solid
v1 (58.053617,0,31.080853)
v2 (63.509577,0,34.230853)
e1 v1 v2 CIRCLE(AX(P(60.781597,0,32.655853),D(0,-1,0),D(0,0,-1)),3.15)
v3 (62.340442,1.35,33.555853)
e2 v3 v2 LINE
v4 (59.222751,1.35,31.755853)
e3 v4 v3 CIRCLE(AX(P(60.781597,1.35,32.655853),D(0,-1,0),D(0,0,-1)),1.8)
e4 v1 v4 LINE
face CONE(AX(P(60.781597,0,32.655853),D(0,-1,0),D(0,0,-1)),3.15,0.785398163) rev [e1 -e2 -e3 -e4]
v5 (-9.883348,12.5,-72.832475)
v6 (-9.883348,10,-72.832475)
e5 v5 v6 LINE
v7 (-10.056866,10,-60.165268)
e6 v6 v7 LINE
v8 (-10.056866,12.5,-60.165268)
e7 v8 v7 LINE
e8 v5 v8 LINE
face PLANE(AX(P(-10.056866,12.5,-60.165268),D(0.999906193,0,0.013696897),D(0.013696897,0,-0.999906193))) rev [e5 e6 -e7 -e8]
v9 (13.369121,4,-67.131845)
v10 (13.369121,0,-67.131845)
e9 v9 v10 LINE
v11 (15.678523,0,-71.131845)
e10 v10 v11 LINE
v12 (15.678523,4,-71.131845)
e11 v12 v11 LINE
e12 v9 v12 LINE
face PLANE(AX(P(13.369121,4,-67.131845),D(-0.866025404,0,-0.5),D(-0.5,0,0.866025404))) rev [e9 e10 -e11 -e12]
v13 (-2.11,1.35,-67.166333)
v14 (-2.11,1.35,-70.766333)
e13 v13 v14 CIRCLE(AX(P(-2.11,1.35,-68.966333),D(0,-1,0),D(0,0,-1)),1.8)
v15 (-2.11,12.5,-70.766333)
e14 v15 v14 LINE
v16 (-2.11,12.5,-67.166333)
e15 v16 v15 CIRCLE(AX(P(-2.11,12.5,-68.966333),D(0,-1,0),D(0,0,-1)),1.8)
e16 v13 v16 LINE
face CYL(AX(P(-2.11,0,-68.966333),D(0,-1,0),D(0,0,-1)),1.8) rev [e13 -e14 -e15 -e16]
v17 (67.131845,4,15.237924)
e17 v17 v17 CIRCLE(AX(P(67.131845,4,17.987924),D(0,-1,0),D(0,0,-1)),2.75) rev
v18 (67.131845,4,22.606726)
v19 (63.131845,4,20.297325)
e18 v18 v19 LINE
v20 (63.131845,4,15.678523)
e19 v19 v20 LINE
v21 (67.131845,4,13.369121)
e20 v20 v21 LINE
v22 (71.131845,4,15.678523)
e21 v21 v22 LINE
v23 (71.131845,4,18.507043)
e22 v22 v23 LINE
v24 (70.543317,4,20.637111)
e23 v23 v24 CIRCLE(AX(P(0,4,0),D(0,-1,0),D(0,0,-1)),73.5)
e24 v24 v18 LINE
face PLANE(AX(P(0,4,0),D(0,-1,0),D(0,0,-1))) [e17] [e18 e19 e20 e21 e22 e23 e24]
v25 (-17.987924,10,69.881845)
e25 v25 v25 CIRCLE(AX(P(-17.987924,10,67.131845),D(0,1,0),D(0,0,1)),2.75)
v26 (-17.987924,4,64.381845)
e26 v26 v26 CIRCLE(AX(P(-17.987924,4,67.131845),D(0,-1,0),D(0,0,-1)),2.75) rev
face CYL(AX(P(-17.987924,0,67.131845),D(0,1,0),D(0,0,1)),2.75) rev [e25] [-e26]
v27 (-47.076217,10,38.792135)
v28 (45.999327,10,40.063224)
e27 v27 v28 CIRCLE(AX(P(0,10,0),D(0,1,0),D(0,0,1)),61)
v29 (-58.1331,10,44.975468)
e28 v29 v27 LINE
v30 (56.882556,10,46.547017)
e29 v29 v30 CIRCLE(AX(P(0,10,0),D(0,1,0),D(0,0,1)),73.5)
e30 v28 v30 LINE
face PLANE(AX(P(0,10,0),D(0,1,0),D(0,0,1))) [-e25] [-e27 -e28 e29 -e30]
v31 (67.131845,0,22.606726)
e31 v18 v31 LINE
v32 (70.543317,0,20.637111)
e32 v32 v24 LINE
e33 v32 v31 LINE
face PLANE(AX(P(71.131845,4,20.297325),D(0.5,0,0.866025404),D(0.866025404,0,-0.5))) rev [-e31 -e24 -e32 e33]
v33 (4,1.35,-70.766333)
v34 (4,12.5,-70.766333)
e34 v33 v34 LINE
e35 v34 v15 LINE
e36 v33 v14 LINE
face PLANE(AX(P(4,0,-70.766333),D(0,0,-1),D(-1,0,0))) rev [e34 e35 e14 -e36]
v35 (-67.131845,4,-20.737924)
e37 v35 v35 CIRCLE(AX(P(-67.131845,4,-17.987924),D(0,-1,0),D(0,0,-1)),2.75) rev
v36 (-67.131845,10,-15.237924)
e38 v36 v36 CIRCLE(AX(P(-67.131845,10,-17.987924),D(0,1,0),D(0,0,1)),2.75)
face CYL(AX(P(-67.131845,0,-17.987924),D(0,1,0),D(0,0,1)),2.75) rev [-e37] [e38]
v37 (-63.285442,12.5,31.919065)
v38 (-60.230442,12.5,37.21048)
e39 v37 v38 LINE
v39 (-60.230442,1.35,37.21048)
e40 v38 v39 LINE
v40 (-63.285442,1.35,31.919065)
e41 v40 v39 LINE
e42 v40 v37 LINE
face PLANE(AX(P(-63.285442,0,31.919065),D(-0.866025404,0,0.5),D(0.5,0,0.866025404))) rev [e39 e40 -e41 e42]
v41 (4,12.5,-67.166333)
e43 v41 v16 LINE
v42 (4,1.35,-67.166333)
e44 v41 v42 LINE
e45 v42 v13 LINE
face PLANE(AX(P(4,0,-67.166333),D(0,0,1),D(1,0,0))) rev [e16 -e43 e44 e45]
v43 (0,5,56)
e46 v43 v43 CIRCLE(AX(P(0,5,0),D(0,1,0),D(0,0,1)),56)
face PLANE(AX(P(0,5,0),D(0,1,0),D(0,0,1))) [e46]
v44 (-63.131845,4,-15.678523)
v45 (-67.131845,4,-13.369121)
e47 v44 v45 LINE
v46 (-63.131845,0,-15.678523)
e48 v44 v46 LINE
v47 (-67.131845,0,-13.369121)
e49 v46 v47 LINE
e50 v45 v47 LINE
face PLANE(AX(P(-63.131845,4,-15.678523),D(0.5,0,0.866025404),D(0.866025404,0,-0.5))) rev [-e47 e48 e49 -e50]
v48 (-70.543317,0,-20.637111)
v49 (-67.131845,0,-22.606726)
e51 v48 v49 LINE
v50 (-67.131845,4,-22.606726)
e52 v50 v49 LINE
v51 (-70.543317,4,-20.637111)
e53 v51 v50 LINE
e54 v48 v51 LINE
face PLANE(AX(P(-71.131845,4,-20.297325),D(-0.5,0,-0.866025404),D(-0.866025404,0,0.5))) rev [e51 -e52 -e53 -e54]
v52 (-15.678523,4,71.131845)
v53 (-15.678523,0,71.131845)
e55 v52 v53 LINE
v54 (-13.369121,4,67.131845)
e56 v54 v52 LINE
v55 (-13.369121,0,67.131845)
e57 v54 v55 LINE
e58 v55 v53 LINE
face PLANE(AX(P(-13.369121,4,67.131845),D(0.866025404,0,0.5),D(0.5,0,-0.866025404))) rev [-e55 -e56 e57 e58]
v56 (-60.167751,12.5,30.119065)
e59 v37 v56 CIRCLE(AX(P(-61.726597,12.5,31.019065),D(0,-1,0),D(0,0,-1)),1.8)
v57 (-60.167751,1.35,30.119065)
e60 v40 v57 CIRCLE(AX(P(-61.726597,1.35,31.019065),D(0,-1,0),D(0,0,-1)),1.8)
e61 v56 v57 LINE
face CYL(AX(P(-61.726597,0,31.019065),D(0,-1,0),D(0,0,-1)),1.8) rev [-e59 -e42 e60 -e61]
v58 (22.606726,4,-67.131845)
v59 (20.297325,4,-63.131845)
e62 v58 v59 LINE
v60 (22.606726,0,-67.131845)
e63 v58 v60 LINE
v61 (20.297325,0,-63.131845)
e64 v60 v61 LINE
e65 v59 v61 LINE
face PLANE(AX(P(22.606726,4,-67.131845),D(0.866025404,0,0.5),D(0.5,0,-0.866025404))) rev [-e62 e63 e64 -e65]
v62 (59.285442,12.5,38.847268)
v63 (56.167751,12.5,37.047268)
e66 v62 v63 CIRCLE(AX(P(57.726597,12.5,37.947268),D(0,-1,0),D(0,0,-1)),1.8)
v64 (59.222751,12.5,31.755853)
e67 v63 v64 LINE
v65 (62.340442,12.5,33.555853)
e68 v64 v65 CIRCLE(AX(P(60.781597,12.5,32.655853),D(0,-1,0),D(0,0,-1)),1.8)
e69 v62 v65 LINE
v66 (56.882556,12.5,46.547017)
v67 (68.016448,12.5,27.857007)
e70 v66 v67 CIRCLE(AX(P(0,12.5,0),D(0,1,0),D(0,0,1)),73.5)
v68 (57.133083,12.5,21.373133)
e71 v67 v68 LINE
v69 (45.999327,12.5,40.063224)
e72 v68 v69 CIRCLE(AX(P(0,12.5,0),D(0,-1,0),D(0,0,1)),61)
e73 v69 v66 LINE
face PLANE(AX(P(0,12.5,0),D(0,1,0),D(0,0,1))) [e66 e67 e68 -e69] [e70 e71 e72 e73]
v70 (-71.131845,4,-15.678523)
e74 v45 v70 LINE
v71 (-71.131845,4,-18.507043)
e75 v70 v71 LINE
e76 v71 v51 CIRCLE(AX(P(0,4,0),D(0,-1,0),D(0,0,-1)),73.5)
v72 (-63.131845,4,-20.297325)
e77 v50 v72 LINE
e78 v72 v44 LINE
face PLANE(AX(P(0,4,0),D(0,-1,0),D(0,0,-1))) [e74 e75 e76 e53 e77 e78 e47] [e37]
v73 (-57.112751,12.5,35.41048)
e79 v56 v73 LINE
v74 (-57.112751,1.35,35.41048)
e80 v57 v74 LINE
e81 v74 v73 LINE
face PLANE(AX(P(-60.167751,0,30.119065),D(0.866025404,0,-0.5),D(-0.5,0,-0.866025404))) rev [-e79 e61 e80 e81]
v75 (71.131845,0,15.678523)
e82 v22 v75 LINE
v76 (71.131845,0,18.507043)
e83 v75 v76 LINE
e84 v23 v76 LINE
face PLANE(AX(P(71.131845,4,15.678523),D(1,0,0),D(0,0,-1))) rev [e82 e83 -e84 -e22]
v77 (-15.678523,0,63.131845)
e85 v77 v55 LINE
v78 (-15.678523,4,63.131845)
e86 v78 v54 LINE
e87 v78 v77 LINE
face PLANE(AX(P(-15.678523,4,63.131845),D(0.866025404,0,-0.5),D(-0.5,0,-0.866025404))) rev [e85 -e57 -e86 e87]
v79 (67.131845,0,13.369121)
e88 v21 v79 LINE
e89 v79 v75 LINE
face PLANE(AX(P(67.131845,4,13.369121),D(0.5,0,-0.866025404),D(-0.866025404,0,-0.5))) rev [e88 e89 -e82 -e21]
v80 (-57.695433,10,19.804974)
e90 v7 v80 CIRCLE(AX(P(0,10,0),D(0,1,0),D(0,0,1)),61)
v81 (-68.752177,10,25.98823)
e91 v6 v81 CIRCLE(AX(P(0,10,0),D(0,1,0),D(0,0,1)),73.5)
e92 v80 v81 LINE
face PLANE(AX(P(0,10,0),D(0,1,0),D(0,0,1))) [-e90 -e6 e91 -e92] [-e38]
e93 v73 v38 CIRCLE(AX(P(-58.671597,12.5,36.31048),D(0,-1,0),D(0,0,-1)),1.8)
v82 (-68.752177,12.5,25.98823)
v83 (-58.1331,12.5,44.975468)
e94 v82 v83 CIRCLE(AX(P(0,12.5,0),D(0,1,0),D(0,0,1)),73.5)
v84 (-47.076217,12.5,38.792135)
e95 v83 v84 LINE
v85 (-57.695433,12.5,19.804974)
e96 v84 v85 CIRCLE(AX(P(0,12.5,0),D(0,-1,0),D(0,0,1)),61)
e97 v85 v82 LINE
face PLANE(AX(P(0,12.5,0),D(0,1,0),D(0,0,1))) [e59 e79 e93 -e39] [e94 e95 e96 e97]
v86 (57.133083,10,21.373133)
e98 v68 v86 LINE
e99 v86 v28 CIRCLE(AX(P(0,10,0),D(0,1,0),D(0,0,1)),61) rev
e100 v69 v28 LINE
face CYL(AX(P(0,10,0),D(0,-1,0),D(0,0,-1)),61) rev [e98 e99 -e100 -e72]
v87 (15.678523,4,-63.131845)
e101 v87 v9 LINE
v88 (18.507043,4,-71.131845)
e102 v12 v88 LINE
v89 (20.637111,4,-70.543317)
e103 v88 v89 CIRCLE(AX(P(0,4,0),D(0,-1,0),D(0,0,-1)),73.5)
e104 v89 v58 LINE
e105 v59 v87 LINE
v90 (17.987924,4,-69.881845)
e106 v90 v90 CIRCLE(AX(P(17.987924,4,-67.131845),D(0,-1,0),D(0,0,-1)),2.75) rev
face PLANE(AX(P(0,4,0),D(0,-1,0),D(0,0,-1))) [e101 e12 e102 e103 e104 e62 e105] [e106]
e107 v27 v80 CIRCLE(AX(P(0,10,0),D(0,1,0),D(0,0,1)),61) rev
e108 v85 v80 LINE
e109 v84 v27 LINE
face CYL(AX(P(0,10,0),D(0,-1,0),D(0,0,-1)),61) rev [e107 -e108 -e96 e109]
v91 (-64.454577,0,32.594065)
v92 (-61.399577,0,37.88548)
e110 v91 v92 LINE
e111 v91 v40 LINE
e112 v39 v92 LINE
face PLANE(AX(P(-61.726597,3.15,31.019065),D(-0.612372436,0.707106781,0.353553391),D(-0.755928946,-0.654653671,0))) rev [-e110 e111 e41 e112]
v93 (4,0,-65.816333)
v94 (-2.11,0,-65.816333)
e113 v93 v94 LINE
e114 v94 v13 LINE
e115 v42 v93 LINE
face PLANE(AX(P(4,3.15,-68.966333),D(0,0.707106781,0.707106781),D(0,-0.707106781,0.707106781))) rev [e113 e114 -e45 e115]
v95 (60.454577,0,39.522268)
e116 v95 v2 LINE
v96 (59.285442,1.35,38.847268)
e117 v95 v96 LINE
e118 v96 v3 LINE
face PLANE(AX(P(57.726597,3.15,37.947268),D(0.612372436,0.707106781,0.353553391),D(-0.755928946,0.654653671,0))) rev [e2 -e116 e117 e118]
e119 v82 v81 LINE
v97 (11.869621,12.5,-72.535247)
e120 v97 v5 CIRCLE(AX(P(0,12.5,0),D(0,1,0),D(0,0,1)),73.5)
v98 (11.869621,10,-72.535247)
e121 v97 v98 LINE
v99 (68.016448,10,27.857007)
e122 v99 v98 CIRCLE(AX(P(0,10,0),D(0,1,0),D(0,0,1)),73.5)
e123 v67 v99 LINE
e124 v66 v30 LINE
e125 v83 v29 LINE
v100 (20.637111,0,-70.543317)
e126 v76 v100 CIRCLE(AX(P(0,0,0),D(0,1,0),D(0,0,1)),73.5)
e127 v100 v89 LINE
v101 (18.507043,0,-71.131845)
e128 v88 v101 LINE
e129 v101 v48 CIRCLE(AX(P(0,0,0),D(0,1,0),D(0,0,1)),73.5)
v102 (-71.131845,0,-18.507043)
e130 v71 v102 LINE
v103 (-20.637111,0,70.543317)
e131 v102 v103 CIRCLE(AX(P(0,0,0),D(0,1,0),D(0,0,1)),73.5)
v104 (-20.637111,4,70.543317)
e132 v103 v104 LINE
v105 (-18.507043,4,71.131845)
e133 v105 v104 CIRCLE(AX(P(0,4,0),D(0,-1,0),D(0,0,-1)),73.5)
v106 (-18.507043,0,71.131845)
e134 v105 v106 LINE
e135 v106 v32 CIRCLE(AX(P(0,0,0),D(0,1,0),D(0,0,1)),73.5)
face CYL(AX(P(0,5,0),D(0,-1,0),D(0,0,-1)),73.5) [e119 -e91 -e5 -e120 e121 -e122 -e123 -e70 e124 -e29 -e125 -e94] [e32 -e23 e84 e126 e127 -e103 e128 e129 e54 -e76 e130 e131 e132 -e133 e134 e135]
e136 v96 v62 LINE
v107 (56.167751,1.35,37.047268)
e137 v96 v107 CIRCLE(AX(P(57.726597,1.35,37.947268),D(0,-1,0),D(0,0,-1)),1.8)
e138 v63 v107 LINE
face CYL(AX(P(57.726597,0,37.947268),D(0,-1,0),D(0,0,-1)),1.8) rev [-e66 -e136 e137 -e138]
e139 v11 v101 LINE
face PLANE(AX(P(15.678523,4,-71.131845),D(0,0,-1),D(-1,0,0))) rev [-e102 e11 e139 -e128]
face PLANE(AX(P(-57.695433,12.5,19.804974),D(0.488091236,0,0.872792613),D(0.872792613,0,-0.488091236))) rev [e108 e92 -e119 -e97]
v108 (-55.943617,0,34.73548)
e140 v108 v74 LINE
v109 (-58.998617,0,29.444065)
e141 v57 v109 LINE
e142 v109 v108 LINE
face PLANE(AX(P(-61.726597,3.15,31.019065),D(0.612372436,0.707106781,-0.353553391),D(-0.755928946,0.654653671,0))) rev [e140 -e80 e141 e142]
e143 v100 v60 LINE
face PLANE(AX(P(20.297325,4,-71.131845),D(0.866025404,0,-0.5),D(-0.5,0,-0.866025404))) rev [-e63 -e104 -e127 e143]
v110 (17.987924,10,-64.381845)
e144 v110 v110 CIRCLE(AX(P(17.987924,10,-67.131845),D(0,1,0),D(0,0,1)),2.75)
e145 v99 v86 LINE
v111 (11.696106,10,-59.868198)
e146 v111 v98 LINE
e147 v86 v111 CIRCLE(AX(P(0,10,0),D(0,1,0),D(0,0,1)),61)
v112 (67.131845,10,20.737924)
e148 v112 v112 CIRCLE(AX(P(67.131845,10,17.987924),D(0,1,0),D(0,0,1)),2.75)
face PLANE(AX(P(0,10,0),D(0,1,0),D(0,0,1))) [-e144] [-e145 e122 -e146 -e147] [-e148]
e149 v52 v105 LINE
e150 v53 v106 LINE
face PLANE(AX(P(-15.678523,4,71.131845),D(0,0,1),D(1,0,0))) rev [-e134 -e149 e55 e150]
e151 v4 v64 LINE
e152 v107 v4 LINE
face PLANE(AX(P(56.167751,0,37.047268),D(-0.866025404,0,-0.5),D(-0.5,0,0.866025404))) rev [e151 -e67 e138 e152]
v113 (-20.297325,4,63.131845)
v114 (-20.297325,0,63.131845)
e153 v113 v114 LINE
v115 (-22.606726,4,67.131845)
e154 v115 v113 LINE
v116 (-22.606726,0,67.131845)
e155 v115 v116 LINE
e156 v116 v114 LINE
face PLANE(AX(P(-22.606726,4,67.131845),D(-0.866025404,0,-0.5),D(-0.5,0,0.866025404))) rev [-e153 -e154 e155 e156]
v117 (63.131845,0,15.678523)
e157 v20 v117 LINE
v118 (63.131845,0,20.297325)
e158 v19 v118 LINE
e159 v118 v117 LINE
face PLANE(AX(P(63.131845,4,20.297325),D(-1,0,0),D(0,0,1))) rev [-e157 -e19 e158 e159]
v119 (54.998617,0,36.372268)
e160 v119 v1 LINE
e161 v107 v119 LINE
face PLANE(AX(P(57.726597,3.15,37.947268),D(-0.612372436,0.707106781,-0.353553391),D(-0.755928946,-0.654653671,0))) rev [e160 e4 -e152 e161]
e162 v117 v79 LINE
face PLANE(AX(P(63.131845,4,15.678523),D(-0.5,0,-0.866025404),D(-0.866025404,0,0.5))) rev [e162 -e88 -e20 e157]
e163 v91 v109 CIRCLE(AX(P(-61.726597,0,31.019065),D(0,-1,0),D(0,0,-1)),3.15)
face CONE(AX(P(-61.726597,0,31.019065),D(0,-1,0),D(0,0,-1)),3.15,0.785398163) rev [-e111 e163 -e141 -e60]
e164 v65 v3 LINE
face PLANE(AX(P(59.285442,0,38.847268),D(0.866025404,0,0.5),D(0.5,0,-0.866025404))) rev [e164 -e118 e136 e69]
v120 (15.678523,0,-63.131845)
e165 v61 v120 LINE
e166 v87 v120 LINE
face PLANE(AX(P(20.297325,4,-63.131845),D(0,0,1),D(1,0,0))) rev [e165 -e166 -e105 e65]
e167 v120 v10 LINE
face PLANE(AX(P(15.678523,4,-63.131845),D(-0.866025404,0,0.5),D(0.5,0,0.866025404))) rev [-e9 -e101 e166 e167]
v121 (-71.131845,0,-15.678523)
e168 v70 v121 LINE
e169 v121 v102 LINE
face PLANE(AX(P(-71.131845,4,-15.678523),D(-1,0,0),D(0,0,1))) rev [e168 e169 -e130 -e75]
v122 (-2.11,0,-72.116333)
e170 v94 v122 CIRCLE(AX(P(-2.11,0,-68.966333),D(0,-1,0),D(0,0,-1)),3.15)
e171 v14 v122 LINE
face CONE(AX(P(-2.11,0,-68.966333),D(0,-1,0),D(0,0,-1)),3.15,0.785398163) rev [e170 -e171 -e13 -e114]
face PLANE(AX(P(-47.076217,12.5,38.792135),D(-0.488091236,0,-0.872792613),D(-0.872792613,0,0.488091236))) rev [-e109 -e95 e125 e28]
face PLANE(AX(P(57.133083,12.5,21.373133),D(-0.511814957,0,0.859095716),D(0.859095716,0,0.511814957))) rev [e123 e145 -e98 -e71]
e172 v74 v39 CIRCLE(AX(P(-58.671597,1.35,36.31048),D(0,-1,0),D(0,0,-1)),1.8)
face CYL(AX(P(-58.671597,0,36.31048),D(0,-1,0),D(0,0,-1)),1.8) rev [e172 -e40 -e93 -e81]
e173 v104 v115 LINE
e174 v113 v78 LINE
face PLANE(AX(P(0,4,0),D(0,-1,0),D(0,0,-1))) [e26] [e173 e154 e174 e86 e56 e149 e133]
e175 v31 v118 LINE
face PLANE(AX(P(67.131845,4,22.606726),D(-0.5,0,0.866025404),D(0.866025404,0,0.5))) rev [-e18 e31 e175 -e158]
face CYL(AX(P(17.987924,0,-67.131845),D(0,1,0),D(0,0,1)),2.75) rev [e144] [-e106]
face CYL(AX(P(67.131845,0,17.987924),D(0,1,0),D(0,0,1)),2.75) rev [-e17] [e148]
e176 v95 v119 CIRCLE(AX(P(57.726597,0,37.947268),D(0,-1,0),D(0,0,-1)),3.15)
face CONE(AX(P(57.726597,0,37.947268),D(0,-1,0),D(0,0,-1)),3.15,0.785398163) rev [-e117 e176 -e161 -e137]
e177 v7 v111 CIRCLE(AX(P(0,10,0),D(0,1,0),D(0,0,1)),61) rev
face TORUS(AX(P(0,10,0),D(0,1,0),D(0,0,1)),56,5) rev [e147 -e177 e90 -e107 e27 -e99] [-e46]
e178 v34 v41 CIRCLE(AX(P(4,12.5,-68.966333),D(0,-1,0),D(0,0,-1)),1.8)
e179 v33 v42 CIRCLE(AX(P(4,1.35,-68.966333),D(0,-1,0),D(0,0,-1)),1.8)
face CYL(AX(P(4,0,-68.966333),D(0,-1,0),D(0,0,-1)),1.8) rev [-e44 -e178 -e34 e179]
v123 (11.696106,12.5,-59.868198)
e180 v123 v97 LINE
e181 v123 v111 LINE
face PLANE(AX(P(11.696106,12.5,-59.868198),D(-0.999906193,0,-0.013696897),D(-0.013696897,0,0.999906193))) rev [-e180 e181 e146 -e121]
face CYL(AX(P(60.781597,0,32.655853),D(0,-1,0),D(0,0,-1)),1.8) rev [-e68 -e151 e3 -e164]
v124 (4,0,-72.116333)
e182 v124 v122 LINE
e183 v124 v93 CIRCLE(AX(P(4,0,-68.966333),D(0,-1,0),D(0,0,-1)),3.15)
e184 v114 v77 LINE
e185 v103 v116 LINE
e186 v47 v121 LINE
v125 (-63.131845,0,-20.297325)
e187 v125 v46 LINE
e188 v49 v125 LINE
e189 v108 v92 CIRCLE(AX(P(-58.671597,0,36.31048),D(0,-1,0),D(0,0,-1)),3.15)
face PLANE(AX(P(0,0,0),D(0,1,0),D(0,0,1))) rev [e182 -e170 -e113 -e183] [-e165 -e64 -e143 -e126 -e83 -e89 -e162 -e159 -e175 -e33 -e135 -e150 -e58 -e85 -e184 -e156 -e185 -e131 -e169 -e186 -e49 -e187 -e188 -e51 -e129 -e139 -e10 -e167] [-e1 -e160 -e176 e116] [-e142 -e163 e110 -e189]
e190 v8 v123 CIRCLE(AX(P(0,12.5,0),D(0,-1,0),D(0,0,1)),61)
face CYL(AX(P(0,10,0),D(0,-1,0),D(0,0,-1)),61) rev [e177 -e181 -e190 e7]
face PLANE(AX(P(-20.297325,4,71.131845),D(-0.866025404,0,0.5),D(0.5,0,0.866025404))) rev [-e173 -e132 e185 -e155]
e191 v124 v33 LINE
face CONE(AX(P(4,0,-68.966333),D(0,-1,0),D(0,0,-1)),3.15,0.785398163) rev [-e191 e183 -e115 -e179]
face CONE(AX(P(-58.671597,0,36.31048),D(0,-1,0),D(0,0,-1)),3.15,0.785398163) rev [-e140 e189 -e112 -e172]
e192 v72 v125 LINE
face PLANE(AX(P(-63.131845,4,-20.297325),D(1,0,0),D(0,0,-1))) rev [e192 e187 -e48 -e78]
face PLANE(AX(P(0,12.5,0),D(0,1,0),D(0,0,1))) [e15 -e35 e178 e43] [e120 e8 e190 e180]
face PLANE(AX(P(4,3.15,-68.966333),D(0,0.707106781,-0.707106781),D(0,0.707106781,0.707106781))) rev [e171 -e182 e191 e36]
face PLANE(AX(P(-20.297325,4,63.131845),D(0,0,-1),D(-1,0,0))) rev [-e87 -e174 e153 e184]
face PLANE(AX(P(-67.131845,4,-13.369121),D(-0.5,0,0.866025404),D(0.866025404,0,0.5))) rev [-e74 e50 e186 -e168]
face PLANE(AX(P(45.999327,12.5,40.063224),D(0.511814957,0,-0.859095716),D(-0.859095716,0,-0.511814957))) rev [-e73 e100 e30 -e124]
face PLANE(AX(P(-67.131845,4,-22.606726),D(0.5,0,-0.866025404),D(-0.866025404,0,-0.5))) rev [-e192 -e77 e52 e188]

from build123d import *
from build123d.topology import SkipClean

# Parameters (mm, degrees)
CROQUIS1_R                                     = 73.5
SALIENTE_EXTRUIR1_DEPTH                        = 5
CROQUIS7_R                                     = 73.5
CROQUIS7_R_2                                   = 61
SALIENTE_EXTRUIR2_DEPTH                        = 5
CROQUIS8_R                                     = 2.75
CORTAR_EXTRUIR5_DEPTH                          = 105.424613957
CORTAR_EXTRUIR6_DEPTH                          = 4
BOSS_EXTRUDE1_DEPTH                            = 2.5
CSK_SLOT_FOR_M3_FLAT_HEAD_MACHINE_SCREW1_DEPTH = 12.5
CIRPATTERN1_COUNT                              = 3
FILLET3_R                                      = 5


with BuildPart() as part:
    # Croquis1 → Saliente-Extruir1 (new body)
    with BuildSketch(Plane(origin=(0, 0, 0), x_dir=(1, 0, 0), z_dir=(0, 1, 0))):
        with Locations(Location((0, 0, 0), (0, 0, 270))):
            Circle(CROQUIS1_R)
    extrude(amount=SALIENTE_EXTRUIR1_DEPTH)

    # Croquis7 → Saliente-Extruir2 (add)
    with BuildSketch(Plane(origin=(0, 5, 0), x_dir=(1, 0, 0), z_dir=(0, 1, 0))):
        with Locations(Location((0, 0, 0), (0, 0, 270))):
            Circle(CROQUIS7_R)
        with Locations(Location((0, 0, 0), (0, 0, 270))):
            Circle(CROQUIS7_R_2, mode=Mode.SUBTRACT)
    extrude(amount=SALIENTE_EXTRUIR2_DEPTH)

    # Croquis8 → Cortar-Extruir5 (cut, through all)
    with BuildSketch(Plane(origin=(0, 10, 0), x_dir=(1, 0, 0), z_dir=(0, 1, 0))):
        with Locations(Location((-17.987923635, -67.131844927, 0), (0, 0, 270))):
            Circle(CROQUIS8_R)
        with Locations(Location((-67.131844927, 17.987923635, 0), (0, 0, 270))):
            Circle(CROQUIS8_R)
        with Locations(Location((17.987923635, 67.131844927, 0), (0, 0, 270))):
            Circle(CROQUIS8_R)
        with Locations(Location((67.131844927, -17.987923635, 0), (0, 0, 270))):
            Circle(CROQUIS8_R)
    extrude(amount=-CORTAR_EXTRUIR5_DEPTH, mode=Mode.SUBTRACT)

    # Croquis9 → Cortar-Extruir6 (cut)
    with BuildSketch(Plane(origin=(0, 0, 0), x_dir=(-1, 0, 0), z_dir=(0, -1, 0))):
        Polygon((20.297324711, -63.131844927), (15.678522558, -63.131844927), (13.369121481, -67.131844927), (15.678522558, -71.131844927), (20.297324711, -71.131844927), (22.606725788, -67.131844927), align=None)
        Polygon((-63.131844927, -20.297324711), (-63.131844927, -15.678522558), (-67.131844927, -13.369121481), (-71.131844927, -15.678522558), (-71.131844927, -20.297324711), (-67.131844927, -22.606725788), align=None)
        Polygon((-20.297324711, 63.131844927), (-15.678522558, 63.131844927), (-13.369121481, 67.131844927), (-15.678522558, 71.131844927), (-20.297324711, 71.131844927), (-22.606725788, 67.131844927), align=None)
        Polygon((63.131844927, 20.297324711), (63.131844927, 15.678522558), (67.131844927, 13.369121481), (71.131844927, 15.678522558), (71.131844927, 20.297324711), (67.131844927, 22.606725788), align=None)
    extrude(amount=-CORTAR_EXTRUIR6_DEPTH, mode=Mode.SUBTRACT)

    # Sketch3 → Boss-Extrude1 (add)
    with SkipClean():  # the faces are left unmerged after this step: merging them gives an invalid solid
        with BuildSketch(Plane(origin=(0, 10, 0), x_dir=(1, 0, 0), z_dir=(0, 1, 0))):
            with BuildLine():
                Line((11.696105723, 59.868197826), (11.869621272, 72.535247231))
                ThreePointArc((11.869621272, 72.535247231), (1.004194341, 73.493139773), (-9.883348207, 72.832475093))
                Line((-9.883348207, 72.832475093), (-10.056865919, 60.165267787))
                ThreePointArc((-10.056865919, 60.165267787), (0.832970242, 60.994312526), (11.696105723, 59.868197826))
            make_face()
            with BuildLine():
                Line((-57.695433057, -19.804974232), (-68.752177408, -25.98823006))
                ThreePointArc((-68.752177408, -25.98823006), (-64.149023218, -35.876912077), (-58.133099548, -44.975468168))
                Line((-58.133099548, -44.975468168), (-47.076217369, -38.792135262))
                ThreePointArc((-47.076217369, -38.792135262), (-53.239109255, -29.775782873), (-57.695433057, -19.804974232))
            make_face()
            with BuildLine():
                Line((45.999327335, -40.063223594), (56.882556136, -46.547017171))
                ThreePointArc((56.882556136, -46.547017171), (63.144828877, -37.616227696), (68.016447755, -27.857006925))
                Line((68.016447755, -27.857006925), (57.133083289, -21.373132525))
                ThreePointArc((57.133083289, -21.373132525), (52.406139013, -31.218529653), (45.999327335, -40.063223594))
            make_face()
        extrude(amount=BOSS_EXTRUDE1_DEPTH)

    # CSK SLOT for M3 Flat Head Machine Screw1: read off the stored shape, not the designer's step
    # CSK SLOT for M3 Flat Head Machine Sc 2 → CSK SLOT for M3 Flat Head Machine Screw1 (cut)
    with SkipClean():  # the faces are left unmerged after this step: merging them gives an invalid solid
        with BuildSketch(Plane(origin=(0, 0, 0), x_dir=(1, 0, 0), z_dir=(0, 1, 0))):
            with BuildLine():
                ThreePointArc((-60.230442327, -37.210480227), (-57.7715966, -37.869325954), (-57.112750874, -35.410480227))
                Line((-57.112750874, -35.410480227), (-60.167750874, -30.11906501))
                ThreePointArc((-60.167750874, -30.11906501), (-62.626596601, -29.460219283), (-63.285442327, -31.91906501))
                Line((-63.285442327, -31.91906501), (-60.230442327, -37.210480227))
            make_face()
        csk_slot_for_m3_flat_head_machine_screw1 = extrude(amount=CSK_SLOT_FOR_M3_FLAT_HEAD_MACHINE_SCREW1_DEPTH, mode=Mode.SUBTRACT)

    # CSK SLOT for M3 Flat Head Machine Sc 3: loft between two sections, ruled curve by curve
    with SkipClean():  # the faces are left unmerged after this step: merging them gives an invalid solid
        csk_slot_for_m3_flat_head_machine_sc_3_from = [
            Edge.make_three_point_arc((-57.112750874, 1.35, 35.410480227), (-56.932930113, 1.35, 36.776354508), (-57.7715966, 1.35, 37.869325954)),
            Edge.make_three_point_arc((-57.7715966, 1.35, 37.869325954), (-59.137470882, 1.35, 38.049146714), (-60.230442327, 1.35, 37.210480227)),
            Edge.make_three_point_arc((-63.285442327, 1.35, 31.91906501), (-63.465263088, 1.35, 30.553190729), (-62.6265966, 1.35, 29.460219283)),
            Edge.make_three_point_arc((-62.6265966, 1.35, 29.460219283), (-61.260722319, 1.35, 29.280398523), (-60.167750874, 1.35, 30.11906501)),
            Edge.make_line((-60.230442327, 1.35, 37.210480227), (-63.285442327, 1.35, 31.91906501)),
            Edge.make_line((-57.112750874, 1.35, 35.410480227), (-60.167750874, 1.35, 30.11906501)),
        ]
        csk_slot_for_m3_flat_head_machine_sc_3_to = [
            Edge.make_three_point_arc((-55.943616578, 0, 34.735480227), (-55.628930248, 0, 37.125760219), (-57.0965966, 0, 39.038460249)),
            Edge.make_three_point_arc((-57.0965966, 0, 39.038460249), (-59.486876592, 0, 39.35314658), (-61.399576622, 0, 37.885480227)),
            Edge.make_three_point_arc((-64.454576622, 0, 32.59406501), (-64.769262953, 0, 30.203785018), (-63.3015966, 0, 28.291084988)),
            Edge.make_three_point_arc((-63.3015966, 0, 28.291084988), (-60.911316608, 0, 27.976398657), (-58.998616578, 0, 29.44406501)),
            Edge.make_line((-61.399576622, 0, 37.885480227), (-64.454576622, 0, 32.59406501)),
            Edge.make_line((-55.943616578, 0, 34.735480227), (-58.998616578, 0, 29.44406501)),
        ]
        csk_slot_for_m3_flat_head_machine_sc_3 = Solid(Shell([*[Face.make_surface_from_curves(csk_slot_for_m3_flat_head_machine_sc_3_from[k], csk_slot_for_m3_flat_head_machine_sc_3_to[k]) for k in range(6)], Face(Wire(csk_slot_for_m3_flat_head_machine_sc_3_from)), Face(Wire(csk_slot_for_m3_flat_head_machine_sc_3_to))]))
        add(csk_slot_for_m3_flat_head_machine_sc_3, mode=Mode.SUBTRACT)

    # CirPattern1: CSK SLOT for M3 Flat Head Machine Screw1, CSK SLOT for M3 Flat Head Machine Sc 3 ×3 about axis
    with SkipClean():  # the faces are left unmerged after this step: merging them gives an invalid solid
        cirpattern1_axis = Axis((0, 0, 0), (0, 1, 0))
        add([csk_slot_for_m3_flat_head_machine_screw1.rotate(cirpattern1_axis, i * 360 / CIRPATTERN1_COUNT) for i in range(1, CIRPATTERN1_COUNT)], mode=Mode.SUBTRACT)
        add([csk_slot_for_m3_flat_head_machine_sc_3.rotate(cirpattern1_axis, i * 360 / CIRPATTERN1_COUNT) for i in range(1, CIRPATTERN1_COUNT)], mode=Mode.SUBTRACT)

    # Fillet3
    fillet3_edges = [part.edges().sort_by_distance(p)[0] for p in [
        (0, 5, -61),
    ]]
    fillet(fillet3_edges, radius=FILLET3_R - 0.0001)  # a hair under: the kernel refuses the full size


solid = part.part
